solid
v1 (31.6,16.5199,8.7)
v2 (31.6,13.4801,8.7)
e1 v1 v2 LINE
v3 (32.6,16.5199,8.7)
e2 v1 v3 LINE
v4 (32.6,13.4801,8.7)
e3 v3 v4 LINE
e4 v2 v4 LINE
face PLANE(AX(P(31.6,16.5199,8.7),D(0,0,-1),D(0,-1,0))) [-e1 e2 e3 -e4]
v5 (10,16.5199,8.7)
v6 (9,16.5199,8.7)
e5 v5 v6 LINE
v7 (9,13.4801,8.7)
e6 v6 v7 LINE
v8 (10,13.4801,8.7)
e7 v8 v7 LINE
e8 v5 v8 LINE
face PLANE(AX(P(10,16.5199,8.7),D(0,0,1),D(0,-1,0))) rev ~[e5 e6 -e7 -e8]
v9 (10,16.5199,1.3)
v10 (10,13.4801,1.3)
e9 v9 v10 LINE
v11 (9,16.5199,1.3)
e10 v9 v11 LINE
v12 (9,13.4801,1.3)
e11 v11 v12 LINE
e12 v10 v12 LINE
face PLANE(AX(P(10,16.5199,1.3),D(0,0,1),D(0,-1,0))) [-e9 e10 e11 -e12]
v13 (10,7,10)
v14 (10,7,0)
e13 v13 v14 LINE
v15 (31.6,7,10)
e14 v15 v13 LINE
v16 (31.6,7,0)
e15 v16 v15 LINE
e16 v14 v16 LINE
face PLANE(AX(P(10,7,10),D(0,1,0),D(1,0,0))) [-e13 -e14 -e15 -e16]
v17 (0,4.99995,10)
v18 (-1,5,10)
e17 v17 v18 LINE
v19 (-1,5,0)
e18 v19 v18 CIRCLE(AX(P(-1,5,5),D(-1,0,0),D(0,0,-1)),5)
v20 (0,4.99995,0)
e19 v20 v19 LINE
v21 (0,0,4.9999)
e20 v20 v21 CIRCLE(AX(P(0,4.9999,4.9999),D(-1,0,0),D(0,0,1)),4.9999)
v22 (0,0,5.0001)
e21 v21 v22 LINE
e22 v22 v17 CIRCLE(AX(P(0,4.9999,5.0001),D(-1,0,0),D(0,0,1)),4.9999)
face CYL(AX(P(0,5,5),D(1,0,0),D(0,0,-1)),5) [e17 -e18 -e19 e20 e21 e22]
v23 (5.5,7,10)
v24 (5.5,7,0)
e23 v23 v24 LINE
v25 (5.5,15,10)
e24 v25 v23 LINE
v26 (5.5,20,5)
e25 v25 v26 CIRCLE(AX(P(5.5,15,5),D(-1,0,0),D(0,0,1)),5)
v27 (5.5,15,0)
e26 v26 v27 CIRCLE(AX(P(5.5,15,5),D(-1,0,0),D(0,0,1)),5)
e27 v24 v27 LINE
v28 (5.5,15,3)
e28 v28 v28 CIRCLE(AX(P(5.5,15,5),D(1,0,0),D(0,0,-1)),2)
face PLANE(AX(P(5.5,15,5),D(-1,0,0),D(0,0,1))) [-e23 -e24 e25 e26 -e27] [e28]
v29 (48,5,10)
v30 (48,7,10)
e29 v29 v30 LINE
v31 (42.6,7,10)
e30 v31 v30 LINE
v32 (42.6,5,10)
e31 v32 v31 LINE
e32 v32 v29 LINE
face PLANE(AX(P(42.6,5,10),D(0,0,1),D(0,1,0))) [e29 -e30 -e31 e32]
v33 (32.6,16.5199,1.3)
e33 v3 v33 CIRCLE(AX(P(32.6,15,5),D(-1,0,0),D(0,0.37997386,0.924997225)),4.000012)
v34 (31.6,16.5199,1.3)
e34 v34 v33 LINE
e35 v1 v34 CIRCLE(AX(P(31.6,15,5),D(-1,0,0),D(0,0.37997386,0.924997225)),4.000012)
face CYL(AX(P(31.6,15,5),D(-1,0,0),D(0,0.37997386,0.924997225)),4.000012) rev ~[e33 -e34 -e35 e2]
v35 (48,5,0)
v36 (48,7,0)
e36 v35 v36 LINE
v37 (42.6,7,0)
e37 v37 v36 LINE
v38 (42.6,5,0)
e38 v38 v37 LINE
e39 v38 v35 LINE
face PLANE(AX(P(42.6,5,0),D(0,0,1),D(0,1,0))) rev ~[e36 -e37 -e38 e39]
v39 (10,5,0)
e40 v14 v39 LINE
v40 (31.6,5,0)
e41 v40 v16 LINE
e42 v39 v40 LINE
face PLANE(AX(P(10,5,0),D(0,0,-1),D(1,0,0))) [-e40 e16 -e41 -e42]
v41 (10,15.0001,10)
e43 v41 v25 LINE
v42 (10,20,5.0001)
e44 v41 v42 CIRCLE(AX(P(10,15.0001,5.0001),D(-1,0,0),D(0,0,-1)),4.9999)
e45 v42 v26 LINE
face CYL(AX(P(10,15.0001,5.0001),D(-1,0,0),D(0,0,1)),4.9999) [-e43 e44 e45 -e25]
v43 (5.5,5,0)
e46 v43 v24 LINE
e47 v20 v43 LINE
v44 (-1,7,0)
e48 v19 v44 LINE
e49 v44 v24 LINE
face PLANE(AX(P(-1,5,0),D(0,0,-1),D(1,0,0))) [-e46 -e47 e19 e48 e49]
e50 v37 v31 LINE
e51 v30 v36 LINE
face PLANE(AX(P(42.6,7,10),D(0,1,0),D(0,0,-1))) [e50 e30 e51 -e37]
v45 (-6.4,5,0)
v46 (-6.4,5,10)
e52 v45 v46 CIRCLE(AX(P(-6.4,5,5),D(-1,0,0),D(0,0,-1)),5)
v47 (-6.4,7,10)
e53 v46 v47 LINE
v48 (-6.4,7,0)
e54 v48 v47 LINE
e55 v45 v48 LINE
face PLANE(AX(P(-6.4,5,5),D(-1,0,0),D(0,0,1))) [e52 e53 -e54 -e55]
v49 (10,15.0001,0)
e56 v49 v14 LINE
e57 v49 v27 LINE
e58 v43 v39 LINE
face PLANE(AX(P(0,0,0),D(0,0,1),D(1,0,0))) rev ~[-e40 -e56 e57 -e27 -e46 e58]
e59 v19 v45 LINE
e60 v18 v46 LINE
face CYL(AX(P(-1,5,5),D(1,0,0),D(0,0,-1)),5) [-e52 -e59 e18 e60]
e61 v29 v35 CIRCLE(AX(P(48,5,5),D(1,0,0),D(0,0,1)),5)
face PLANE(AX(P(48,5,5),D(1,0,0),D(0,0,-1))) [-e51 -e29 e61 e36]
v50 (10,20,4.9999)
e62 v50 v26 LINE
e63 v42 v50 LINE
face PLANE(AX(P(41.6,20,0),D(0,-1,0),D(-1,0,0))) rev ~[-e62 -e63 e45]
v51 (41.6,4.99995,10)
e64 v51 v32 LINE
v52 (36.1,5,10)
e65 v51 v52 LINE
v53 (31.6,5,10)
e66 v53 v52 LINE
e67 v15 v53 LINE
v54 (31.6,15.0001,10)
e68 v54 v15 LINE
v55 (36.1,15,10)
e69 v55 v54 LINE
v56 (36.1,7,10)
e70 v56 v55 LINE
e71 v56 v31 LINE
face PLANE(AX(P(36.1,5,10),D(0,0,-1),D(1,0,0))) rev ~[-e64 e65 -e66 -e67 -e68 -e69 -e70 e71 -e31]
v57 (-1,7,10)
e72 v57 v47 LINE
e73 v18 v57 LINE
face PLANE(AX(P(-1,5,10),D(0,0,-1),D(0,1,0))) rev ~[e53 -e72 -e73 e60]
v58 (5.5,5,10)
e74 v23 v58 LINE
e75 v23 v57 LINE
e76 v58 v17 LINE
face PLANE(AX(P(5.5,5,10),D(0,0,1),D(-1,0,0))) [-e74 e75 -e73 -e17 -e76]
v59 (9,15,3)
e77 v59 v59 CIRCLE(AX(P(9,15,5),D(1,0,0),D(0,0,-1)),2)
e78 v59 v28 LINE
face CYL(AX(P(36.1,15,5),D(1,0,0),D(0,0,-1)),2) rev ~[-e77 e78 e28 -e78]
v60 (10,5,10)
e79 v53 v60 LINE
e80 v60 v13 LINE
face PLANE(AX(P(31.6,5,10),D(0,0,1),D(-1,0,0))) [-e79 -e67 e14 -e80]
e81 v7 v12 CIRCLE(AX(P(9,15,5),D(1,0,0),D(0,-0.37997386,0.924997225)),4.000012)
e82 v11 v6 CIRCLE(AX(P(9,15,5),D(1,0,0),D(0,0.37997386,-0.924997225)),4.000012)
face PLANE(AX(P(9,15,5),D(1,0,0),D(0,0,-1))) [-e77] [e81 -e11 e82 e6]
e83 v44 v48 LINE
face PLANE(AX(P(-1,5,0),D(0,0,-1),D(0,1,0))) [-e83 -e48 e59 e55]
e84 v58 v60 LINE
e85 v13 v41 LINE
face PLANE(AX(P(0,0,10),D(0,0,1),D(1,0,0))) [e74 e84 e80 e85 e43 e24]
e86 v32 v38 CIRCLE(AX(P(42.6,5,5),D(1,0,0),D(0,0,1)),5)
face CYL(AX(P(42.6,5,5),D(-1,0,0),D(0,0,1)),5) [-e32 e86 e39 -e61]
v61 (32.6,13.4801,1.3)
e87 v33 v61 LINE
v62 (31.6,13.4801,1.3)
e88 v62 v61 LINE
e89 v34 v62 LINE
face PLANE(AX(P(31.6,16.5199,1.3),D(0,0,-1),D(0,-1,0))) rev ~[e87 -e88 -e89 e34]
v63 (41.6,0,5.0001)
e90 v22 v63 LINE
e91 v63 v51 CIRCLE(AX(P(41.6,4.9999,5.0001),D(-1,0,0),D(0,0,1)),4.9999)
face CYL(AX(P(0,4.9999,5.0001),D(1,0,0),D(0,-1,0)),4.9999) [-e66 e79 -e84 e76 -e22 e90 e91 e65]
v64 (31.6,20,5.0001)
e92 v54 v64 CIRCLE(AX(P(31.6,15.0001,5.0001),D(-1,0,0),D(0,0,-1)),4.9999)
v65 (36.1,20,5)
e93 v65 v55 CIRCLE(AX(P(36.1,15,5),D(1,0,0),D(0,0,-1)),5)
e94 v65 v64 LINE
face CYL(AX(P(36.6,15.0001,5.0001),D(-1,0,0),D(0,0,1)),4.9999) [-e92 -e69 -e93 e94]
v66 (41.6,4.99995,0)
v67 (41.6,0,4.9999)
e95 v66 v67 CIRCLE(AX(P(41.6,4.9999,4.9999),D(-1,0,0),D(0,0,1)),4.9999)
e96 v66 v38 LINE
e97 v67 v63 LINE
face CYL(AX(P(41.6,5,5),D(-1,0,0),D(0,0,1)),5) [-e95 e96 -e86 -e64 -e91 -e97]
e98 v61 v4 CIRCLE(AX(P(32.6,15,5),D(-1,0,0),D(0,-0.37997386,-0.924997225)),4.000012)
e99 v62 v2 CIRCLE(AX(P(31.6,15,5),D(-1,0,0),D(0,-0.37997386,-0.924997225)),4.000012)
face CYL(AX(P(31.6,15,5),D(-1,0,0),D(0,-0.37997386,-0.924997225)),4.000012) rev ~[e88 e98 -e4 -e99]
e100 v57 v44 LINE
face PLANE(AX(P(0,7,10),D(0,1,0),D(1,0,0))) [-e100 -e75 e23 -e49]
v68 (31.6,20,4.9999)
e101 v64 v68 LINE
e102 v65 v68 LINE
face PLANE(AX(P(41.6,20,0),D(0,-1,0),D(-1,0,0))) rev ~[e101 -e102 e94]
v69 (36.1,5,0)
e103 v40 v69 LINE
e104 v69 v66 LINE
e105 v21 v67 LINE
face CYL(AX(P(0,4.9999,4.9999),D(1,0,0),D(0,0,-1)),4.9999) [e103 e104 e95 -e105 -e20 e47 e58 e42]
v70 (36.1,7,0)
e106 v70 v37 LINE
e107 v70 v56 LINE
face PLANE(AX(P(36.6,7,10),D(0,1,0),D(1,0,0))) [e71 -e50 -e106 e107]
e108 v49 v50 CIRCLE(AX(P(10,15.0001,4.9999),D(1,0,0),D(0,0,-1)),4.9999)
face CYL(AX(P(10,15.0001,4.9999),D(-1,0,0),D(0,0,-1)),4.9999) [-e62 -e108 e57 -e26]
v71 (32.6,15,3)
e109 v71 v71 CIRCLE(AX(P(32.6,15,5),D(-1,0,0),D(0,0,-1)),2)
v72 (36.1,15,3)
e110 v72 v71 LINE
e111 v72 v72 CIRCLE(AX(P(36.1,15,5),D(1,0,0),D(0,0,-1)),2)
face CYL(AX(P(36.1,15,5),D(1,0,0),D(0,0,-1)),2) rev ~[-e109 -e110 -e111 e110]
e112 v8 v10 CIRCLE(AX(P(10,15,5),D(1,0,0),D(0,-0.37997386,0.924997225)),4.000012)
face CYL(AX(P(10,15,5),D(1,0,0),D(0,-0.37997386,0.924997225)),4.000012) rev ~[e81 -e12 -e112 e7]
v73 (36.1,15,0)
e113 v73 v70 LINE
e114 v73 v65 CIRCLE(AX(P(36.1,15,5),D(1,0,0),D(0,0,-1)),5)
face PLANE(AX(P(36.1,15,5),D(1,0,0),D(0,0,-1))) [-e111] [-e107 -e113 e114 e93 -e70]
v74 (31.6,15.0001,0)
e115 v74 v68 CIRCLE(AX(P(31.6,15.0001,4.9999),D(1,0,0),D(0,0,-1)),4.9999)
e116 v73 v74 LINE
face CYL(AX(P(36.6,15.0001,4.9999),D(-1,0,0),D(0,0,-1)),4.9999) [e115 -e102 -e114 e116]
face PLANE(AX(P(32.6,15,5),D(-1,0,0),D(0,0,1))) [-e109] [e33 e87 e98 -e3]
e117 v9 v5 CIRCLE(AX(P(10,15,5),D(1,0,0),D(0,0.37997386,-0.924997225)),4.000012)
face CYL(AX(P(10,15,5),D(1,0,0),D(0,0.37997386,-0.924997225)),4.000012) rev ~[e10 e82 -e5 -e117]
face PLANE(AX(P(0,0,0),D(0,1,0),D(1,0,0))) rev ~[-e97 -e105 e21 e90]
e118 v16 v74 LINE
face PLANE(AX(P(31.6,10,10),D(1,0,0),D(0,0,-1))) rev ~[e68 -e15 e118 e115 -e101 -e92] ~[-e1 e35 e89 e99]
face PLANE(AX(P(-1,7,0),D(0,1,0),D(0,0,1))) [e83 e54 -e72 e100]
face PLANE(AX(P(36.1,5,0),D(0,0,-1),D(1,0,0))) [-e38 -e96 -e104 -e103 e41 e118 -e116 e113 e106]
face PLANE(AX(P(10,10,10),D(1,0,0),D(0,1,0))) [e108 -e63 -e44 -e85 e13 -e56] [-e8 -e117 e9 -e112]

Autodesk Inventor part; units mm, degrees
ref_plane "YZ Plane" through (0, 0, 0) normal (1, 0, 0) x (0, 1, 0)
ref_plane "XZ Plane" through (0, 0, 0) normal (0, 1, 0) x (-1, 0, 0)
ref_plane "XY Plane" through (0, 0, 0) normal (0, 0, 1) x (1, 0, 0)
sketch "Sketch1" plane through (0, 0, 0) normal (0, 0, 1) x (1, 0, 0)
  line L0 (0, 0) -> (41.6, 0)
  line L1 (41.6, 0) -> (41.6, 20)
  line L2 (41.6, 20) -> (0, 20)
  line L3 (0, 20) -> (0, 0)
  dimension "d0" = 41.6
  dimension "d1" = 20
extrude "Extrusion1" add sketch "Sketch1" along normal blind 10
sketch "Sketch3" plane through (0, 0, 10) normal (0, 0, 1) x (1, 0, 0)
  line L0 (0, 20) -> (5, 20)
  line L1 (5, 20) -> (5, 10)
  line L2 (5, 10) -> (0, 10)
  line L3 (0, 10) -> (0, 20)
  line L4 (41.6, 20) -> (36.6, 20)
  line L5 (36.6, 20) -> (36.6, 10)
  line L6 (36.6, 10) -> (41.6, 10)
  line L7 (41.6, 10) -> (41.6, 20)
  dimension "d7" = 5
  dimension "d8" = 5
  dimension "d9" = 10
extrude "Extrusion2" cut sketch "Sketch3" against normal through all
sketch "Sketch4" plane through (0, 0, 10) normal (0, 0, 1) x (1, 0, 0)
  line L0 (36.6, 20) -> (5, 20) projected
  line L1 (5, 20) -> (5, 10) projected
  line L2 (10, 20) -> (31.6, 20)
  line L3 (31.6, 20) -> (31.6, 10)
  line L4 (31.6, 10) -> (10, 10)
  line L5 (10, 10) -> (10, 20)
  dimension "d12" = 21.6
  dimension "d13" = 10
  dimension "d14" = 5
extrude "Extrusion3" cut sketch "Sketch4" against normal through all
fillet "Fillet1" radius 5 6 edges at (20.8, 0, 0) (20.8, 0, 10) (34.1, 20, 10) (34.1, 20, 0) (7.5, 20, 0) (7.5, 20, 10)
sketch "Sketch5" plane through (10, 10, 10) normal (0, 1, 0) x (1, 0, 0)
  line L0 (0, 10) -> (21.6, 10) projected
  line L1 (0, 0) -> (0, 10) projected
  line L2 (21.6, 0) -> (0, 0) projected
  line L3 (21.6, 0) -> (21.6, 10) projected
  point P0 (-10, 10)
extrude "Extrusion4" cut sketch "Sketch5" against normal blind 5
sketch "Sketch6" plane through (36.6, 10, 10) normal (0, 1, 0) x (1, 0, 0)
  line L0 (0, 10) -> (5, 10) projected
  line L1 (0, 0) -> (0, 10) projected
  line L2 (5, 0) -> (0, 0) projected
  line L3 (5, 10) -> (5, 0) projected
  point P0 (-36.6, 10)
extrude "Extrusion5" cut sketch "Sketch6" against normal blind 5
sketch "Sketch7" plane through (0, 10, 10) normal (0, 1, 0) x (1, 0, 0)
  line L0 (0, 10) -> (5, 10) projected
  line L1 (0, 0) -> (0, 10) projected
  line L2 (5, 0) -> (0, 0) projected
  line L3 (5, 0) -> (5, 10) projected
extrude "Extrusion6" cut sketch "Sketch7" against normal blind 5
sketch "Sketch8" plane through (5, 15, 5) normal (-1, 0, 0) x (0, 0, 1)
  arc A0 (5, 0) -> (-5, 0) centre (0, 0) ccw projected
  line L0 (-5, -10) -> (-5, 0) projected
  line L1 (-5, -10) -> (5, -10) projected
  line L2 (5, 0) -> (5, -10) projected
  point P0 (-5, -15)
extrude "Extrusion7" cut sketch "Sketch8" against normal blind 0.5
sketch "Sketch9" plane through (36.6, 15, 5) normal (1, 0, 0) x (0, 0, -1)
  arc A0 (5, 0) -> (-5, 0) centre (0, 0) ccw projected
  line L0 (-5, -10) -> (-5, 0) projected
  line L1 (-5, -10) -> (5, -10) projected
  line L2 (5, 0) -> (5, -10) projected
  point P0 (5, -15)
extrude "Extrusion8" cut sketch "Sketch9" against normal blind 0.5
sketch "Sketch10" plane through (36.1, 15, 5) normal (1, 0, 0) x (0, 0, -1)
  arc A0 (5, 0) -> (-5, 0) centre (0, 0) ccw projected
  circle A1 centre (0, 0) radius 2
  point P0 (5, -15)
  dimension "d28" = 4
extrude "Extrusion9" cut sketch "Sketch10" against normal through all
sketch "Sketch11" plane through (31.6, 15, 5) normal (-1, 0, 0) x (0, 0, 1)
  circle A0 centre (0, 0) radius 2 projected
  arc A1 (5, 0) -> (-5, 0) centre (0, 0) ccw projected
  line L0 (5, 0) -> (5, -10) projected
  line L1 (-3.7, 1.5199) -> (-3.7, -1.5199)
  line L2 (3.7, 1.5199) -> (3.7, -1.5199)
  arc A2 (-3.7, -1.5199) -> (3.7, -1.5199) centre (0, 0) ccw
  arc A3 (3.7, 1.5199) -> (-3.7, 1.5199) centre (0, 0) ccw
  point P0 (-5, -15)
  dimension "d33" = 3.7
extrude "Extrusion10" cut sketch "Sketch11" against normal blind 1
sketch "Sketch12" plane through (10, 15, 5) normal (1, 0, 0) x (0, 0, -1)
  circle A0 centre (0, 0) radius 2 projected
  arc A1 (5, 0) -> (-5, 0) centre (0, 0) ccw projected
  line L0 (5, 0) -> (5, -10) projected
  line L1 (3.7, 1.5199) -> (3.7, -1.5199)
  line L2 (-3.7, 1.5199) -> (-3.7, -1.5199)
  arc A2 (-3.7, -1.5199) -> (3.7, -1.5199) centre (0, 0) ccw
  arc A3 (3.7, 1.5199) -> (-3.7, 1.5199) centre (0, 0) ccw
  point P0 (5, -15)
  dimension "d37" = 3.7
extrude "Extrusion11" cut sketch "Sketch12" against normal blind 1
sketch "Sketch13" plane through (41.6, 5, 5) normal (1, 0, 0) x (0, 0, -1)
  line L0 (5, 0) -> (-5, 0) projected
  arc A0 (-5, 0) -> (5, 0) centre (0, 0) ccw projected
  point P0 (5, -5)
extrude "Extrusion12" add sketch "Sketch13" along normal blind 1
sketch "Sketch14" plane through (0, 5, 5) normal (-1, 0, 0) x (0, 0, 1)
  line L0 (5, 0) -> (-5, 0) projected
  arc A0 (-5, 0) -> (5, 0) centre (0, 0) ccw projected
  point P0 (-5, -5)
extrude "Extrusion13" add sketch "Sketch14" along normal blind 1
sketch "Sketch15" plane through (36.6, 5, 10) normal (0, 1, 0) x (1, 0, 0)
  line L0 (-0.5, 10) -> (6, 10) projected
  line L1 (-0.5, 10) -> (-0.5, 0) projected
  line L2 (-0.5, 0) -> (6, 0) projected
  line L3 (6, 10) -> (6, 0) projected
  point P0 (-36.6, 10)
extrude "Extrusion14" add sketch "Sketch15" along normal blind 2
sketch "Sketch16" plane through (10, 5, 10) normal (0, 1, 0) x (1, 0, 0)
  line L0 (0, 10) -> (21.6, 10) projected
  line L1 (0, 0) -> (0, 10) projected
  line L2 (21.6, 0) -> (0, 0) projected
  line L3 (21.6, 10) -> (21.6, 0) projected
  point P0 (-10, 10)
extrude "Extrusion15" add sketch "Sketch16" along normal blind 2
sketch "Sketch17" plane through (0, 5, 10) normal (0, 1, 0) x (1, 0, 0)
  line L0 (-1, 10) -> (5.5, 10) projected
  line L1 (-1, 0) -> (-1, 10) projected
  line L2 (5.5, 0) -> (-1, 0) projected
  line L3 (5.5, 0) -> (5.5, 10) projected
  point P0 (0, 10)
extrude "Extrusion16" add sketch "Sketch17" along normal blind 2
sketch "Sketch18" plane through (-1, 5, 5) normal (-1, 0, 0) x (0, 0, 1)
  arc A0 (-5, 0) -> (5, 0) centre (0, 0) ccw projected
  line L0 (5, 0) -> (5, 2) projected
  line L1 (-5, 2) -> (5, 2) projected
  line L2 (-5, 0) -> (-5, 2) projected
  point P0 (-5, -5)
extrude "Extrusion17" add sketch "Sketch18" along normal blind 5.4
sketch "Sketch19" plane through (42.6, 5, 5) normal (1, 0, 0) x (0, 0, -1)
  arc A0 (-5, 0) -> (5, 0) centre (0, 0) ccw projected
  line L0 (5, 0) -> (5, 2) projected
  line L1 (-5, 2) -> (5, 2) projected
  line L2 (-5, 0) -> (-5, 2) projected
  point P0 (5, -5)
extrude "Extrusion18" add sketch "Sketch19" along normal blind 5.4
properties part number "Slide"
